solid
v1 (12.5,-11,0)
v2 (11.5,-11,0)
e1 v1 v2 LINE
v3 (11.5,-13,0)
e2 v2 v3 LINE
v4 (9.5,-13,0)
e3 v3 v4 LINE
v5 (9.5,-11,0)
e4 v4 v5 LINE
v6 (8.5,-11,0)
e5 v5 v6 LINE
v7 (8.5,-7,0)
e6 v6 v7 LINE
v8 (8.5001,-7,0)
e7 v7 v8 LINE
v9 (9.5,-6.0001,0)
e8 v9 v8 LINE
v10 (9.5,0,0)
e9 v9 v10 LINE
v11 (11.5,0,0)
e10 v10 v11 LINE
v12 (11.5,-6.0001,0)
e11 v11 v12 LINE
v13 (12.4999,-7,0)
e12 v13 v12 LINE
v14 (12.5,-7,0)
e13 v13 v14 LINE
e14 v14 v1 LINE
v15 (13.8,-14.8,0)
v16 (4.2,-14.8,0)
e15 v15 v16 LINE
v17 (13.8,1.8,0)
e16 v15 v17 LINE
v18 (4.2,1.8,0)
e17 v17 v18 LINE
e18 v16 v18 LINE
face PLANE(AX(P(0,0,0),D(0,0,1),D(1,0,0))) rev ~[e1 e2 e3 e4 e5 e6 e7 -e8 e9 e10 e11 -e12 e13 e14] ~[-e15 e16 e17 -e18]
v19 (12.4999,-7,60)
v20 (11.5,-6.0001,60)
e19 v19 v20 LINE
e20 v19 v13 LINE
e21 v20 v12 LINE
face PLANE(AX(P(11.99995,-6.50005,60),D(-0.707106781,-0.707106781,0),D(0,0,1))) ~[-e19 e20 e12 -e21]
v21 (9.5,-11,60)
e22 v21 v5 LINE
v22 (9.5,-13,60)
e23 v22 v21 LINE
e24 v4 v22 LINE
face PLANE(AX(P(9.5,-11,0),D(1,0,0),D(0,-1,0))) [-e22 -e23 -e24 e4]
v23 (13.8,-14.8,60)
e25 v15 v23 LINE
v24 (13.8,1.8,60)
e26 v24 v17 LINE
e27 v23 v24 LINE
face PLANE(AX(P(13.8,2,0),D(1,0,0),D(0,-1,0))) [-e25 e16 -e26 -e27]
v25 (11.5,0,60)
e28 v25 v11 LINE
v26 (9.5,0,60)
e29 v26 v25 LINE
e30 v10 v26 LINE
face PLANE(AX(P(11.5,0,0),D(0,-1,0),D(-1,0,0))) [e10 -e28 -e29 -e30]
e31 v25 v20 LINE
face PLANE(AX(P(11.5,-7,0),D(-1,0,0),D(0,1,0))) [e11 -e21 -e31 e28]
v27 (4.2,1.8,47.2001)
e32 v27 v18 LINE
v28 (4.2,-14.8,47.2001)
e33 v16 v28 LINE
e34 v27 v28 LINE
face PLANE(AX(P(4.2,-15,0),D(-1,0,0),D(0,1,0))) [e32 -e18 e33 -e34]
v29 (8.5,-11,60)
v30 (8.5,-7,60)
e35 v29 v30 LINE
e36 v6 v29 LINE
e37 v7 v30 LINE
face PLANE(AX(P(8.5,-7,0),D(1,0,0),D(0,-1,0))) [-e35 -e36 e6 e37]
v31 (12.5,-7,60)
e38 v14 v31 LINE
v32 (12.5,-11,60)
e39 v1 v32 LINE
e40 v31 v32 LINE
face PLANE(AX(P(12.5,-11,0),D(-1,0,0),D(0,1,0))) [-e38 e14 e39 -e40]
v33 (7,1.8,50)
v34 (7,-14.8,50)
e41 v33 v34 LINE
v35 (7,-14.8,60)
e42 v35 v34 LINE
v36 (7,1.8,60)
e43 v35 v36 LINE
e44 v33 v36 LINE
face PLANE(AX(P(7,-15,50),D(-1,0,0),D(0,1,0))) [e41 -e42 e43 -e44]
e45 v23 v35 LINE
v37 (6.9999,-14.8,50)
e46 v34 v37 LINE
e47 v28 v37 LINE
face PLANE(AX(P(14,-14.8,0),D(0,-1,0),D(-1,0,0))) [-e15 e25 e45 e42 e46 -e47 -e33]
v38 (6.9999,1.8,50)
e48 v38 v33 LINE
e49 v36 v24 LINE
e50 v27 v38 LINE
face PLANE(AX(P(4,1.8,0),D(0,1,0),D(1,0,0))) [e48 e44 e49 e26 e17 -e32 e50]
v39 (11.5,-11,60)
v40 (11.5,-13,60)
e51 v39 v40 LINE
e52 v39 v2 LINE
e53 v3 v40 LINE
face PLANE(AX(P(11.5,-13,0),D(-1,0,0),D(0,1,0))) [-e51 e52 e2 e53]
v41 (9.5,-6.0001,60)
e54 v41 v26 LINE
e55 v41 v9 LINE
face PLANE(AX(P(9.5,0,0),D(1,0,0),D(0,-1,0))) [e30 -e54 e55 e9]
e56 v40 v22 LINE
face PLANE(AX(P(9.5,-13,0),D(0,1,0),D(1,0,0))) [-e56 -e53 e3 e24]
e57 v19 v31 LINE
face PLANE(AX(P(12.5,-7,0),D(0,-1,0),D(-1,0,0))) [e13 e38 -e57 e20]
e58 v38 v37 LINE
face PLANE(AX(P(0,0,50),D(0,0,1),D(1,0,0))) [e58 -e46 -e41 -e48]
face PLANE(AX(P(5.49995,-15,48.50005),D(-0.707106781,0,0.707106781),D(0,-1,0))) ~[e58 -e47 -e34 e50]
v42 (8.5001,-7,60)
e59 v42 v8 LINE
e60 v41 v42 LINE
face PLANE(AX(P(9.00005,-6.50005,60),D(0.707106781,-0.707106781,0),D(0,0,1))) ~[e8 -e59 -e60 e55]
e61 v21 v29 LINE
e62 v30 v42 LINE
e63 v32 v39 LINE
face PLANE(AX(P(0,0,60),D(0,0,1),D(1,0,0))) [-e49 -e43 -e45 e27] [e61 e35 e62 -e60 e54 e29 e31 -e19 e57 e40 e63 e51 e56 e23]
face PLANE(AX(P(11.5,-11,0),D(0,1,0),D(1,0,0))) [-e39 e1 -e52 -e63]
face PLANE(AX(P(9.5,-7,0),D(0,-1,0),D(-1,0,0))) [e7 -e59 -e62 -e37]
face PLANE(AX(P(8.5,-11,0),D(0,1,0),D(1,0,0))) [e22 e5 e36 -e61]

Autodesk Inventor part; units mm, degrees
ref_plane "YZ Plane" through (0, 0, 0) normal (1, 0, 0) x (0, 1, 0)
ref_plane "XZ Plane" through (0, 0, 0) normal (0, 1, 0) x (-1, 0, 0)
ref_plane "XY Plane" through (0, 0, 0) normal (0, 0, 1) x (1, 0, 0)
sketch "Sketch1" plane through (0, 0, 0) normal (0, 0, 1) x (1, 0, 0)
  arc A0 (16, 5) -> (14, 7) centre (14, 5) ccw projected
  line L0 (14, 7) -> (8, 7) projected
  arc A1 (6, 9) -> (8, 7) centre (8, 9) ccw projected
  line L1 (6, 9) -> (6, 25.5) projected
  arc A2 (6, 25.5) -> (4, 27.5) centre (4, 25.5) ccw projected
  line L2 (4, 27.5) -> (-14, 27.5) projected
  arc A3 (-14, 27.5) -> (-16, 25.5) centre (-14, 25.5) ccw projected
  line L3 (-16, 25.5) -> (-16, 20.5) projected
  line L4 (-16, 20.5) -> (4, 20.5) projected
  line L5 (4, 20.5) -> (4, 5) projected
  line L6 (4, 5) -> (14, 5) projected
  line L7 (14, 5) -> (14, -15) projected
  line L8 (14, -15) -> (4, -15) projected
  line L9 (4, -15) -> (4, -20.5) projected
  line L10 (4, -20.5) -> (-16, -20.5) projected
  line L11 (-16, -20.5) -> (-16, -25.5) projected
  arc A4 (-16, -25.5) -> (-14, -27.5) centre (-14, -25.5) ccw projected
  line L12 (-14, -27.5) -> (4, -27.5) projected
  arc A5 (4, -27.5) -> (6, -25.5) centre (4, -25.5) ccw projected
  line L13 (6, -25.5) -> (6, -19) projected
  arc A6 (8, -17) -> (6, -19) centre (8, -19) ccw projected
  line L14 (8, -17) -> (14, -17) projected
  arc A7 (14, -17) -> (16, -15) centre (14, -15) ccw projected
  line L15 (16, -15) -> (16, 5) projected
  circle A8 centre (-10.2273, -23.9687) radius 0.75 projected
  circle A9 centre (-0.7, 24) radius 0.75 projected
  circle A10 centre (-10.2, 24) radius 0.75 projected
  circle A11 centre (-0.7, -24) radius 0.75 projected
  line L16 (11.5, 0) -> (9.5, 0)
  line L17 (9.5, -13) -> (11.5, -13)
  line L18 (12.5, -11) -> (12.5, -7)
  line L19 (8.5, -7) -> (8.5, -11)
  line L20 (8.5, -11) -> (12.5, -7) construction
  line L21 (12.5, -11) -> (8.5, -7) construction
  line L22 (8.5, -11) -> (9.5, -11)
  line L23 (11.5, -11) -> (12.5, -11)
  line L24 (12.5, -7) -> (11.5, -7)
  line L25 (9.5, -7) -> (8.5, -7)
  line L26 (11.5, -13) -> (11.5, -11)
  line L27 (11.5, -7) -> (11.5, 0)
  line L28 (9.5, 0) -> (9.5, -7)
  line L29 (9.5, -11) -> (9.5, -13)
  line L30 (14, -15) -> (4, -15)
  line L31 (4, -15) -> (4, 2)
  line L32 (4, 2) -> (14, 2)
  line L33 (14, 2) -> (14, -15)
  point P0 (0, 0)
  point P1 (10.5, -9)
  dimension "d0" = 2
  dimension "d1" = 13
  dimension "d2" = 4
  dimension "d3" = 4
  dimension "d5" = 17
  dimension "d6" = 1.5
  dimension "d7" = 2
  dimension "d8" = 2
  dimension "d12" = 1
  dimension "d13" = 1
extrude "Extrusion1" add sketch "Sketch1" along normal blind 50 contours L31 L32 L7 L8
sketch "Sketch2" plane through (0, 0, 50) normal (0, 0, 1) x (1, 0, 0)
  line L0 (14, -15) -> (14, 2) projected
  line L1 (14, 2) -> (4, 2) projected
  line L2 (4, 2) -> (4, -15) projected
  line L3 (4, -15) -> (14, -15) projected
  line L4 (8.5, -7) -> (9.5, -7) projected
  line L5 (9.5, -7) -> (9.5, 0) projected
  line L6 (9.5, 0) -> (11.5, 0) projected
  line L7 (11.5, 0) -> (11.5, -7) projected
  line L8 (11.5, -7) -> (12.5, -7) projected
  line L9 (12.5, -7) -> (12.5, -11) projected
  line L10 (12.5, -11) -> (11.5, -11) projected
  line L11 (11.5, -11) -> (11.5, -13) projected
  line L12 (11.5, -13) -> (9.5, -13) projected
  line L13 (9.5, -13) -> (9.5, -11) projected
  line L14 (9.5, -11) -> (8.5, -11) projected
  line L15 (8.5, -11) -> (8.5, -7) projected
  line L16 (14, 2) -> (4, 2) projected
  line L17 (14, -15) -> (7, -15)
  line L18 (7, -15) -> (7, 2)
  line L19 (7, 2) -> (14, 2)
  line L20 (14, 2) -> (14, -15)
  point P0 (0, 0)
  point P1 (7, 2)
  dimension "d11" = 3
extrude "Extrusion2" add sketch "Sketch2" along normal blind 10 contours L3 L18 L1 L0
chamfer "Chamfer1" distance 3 angle 45 1 edges at (4, -6.5, 50)
thicken "Thicken1" operation add thickness 0.2 both sides no extend neighbours yes toward (1, 0, 0) faces at (4, -3.6667, 15.6667) (7.3333, -15, 15.6667) (7.3333, 2, 15.6667) (14, -9.3333, 20)
chamfer "Chamfer2" distance 1 angle 45 2 edges at (11.5, -7, 30) (9.5, -7, 30)
equation "\"d13\" = d12"
properties part number "funnel"
